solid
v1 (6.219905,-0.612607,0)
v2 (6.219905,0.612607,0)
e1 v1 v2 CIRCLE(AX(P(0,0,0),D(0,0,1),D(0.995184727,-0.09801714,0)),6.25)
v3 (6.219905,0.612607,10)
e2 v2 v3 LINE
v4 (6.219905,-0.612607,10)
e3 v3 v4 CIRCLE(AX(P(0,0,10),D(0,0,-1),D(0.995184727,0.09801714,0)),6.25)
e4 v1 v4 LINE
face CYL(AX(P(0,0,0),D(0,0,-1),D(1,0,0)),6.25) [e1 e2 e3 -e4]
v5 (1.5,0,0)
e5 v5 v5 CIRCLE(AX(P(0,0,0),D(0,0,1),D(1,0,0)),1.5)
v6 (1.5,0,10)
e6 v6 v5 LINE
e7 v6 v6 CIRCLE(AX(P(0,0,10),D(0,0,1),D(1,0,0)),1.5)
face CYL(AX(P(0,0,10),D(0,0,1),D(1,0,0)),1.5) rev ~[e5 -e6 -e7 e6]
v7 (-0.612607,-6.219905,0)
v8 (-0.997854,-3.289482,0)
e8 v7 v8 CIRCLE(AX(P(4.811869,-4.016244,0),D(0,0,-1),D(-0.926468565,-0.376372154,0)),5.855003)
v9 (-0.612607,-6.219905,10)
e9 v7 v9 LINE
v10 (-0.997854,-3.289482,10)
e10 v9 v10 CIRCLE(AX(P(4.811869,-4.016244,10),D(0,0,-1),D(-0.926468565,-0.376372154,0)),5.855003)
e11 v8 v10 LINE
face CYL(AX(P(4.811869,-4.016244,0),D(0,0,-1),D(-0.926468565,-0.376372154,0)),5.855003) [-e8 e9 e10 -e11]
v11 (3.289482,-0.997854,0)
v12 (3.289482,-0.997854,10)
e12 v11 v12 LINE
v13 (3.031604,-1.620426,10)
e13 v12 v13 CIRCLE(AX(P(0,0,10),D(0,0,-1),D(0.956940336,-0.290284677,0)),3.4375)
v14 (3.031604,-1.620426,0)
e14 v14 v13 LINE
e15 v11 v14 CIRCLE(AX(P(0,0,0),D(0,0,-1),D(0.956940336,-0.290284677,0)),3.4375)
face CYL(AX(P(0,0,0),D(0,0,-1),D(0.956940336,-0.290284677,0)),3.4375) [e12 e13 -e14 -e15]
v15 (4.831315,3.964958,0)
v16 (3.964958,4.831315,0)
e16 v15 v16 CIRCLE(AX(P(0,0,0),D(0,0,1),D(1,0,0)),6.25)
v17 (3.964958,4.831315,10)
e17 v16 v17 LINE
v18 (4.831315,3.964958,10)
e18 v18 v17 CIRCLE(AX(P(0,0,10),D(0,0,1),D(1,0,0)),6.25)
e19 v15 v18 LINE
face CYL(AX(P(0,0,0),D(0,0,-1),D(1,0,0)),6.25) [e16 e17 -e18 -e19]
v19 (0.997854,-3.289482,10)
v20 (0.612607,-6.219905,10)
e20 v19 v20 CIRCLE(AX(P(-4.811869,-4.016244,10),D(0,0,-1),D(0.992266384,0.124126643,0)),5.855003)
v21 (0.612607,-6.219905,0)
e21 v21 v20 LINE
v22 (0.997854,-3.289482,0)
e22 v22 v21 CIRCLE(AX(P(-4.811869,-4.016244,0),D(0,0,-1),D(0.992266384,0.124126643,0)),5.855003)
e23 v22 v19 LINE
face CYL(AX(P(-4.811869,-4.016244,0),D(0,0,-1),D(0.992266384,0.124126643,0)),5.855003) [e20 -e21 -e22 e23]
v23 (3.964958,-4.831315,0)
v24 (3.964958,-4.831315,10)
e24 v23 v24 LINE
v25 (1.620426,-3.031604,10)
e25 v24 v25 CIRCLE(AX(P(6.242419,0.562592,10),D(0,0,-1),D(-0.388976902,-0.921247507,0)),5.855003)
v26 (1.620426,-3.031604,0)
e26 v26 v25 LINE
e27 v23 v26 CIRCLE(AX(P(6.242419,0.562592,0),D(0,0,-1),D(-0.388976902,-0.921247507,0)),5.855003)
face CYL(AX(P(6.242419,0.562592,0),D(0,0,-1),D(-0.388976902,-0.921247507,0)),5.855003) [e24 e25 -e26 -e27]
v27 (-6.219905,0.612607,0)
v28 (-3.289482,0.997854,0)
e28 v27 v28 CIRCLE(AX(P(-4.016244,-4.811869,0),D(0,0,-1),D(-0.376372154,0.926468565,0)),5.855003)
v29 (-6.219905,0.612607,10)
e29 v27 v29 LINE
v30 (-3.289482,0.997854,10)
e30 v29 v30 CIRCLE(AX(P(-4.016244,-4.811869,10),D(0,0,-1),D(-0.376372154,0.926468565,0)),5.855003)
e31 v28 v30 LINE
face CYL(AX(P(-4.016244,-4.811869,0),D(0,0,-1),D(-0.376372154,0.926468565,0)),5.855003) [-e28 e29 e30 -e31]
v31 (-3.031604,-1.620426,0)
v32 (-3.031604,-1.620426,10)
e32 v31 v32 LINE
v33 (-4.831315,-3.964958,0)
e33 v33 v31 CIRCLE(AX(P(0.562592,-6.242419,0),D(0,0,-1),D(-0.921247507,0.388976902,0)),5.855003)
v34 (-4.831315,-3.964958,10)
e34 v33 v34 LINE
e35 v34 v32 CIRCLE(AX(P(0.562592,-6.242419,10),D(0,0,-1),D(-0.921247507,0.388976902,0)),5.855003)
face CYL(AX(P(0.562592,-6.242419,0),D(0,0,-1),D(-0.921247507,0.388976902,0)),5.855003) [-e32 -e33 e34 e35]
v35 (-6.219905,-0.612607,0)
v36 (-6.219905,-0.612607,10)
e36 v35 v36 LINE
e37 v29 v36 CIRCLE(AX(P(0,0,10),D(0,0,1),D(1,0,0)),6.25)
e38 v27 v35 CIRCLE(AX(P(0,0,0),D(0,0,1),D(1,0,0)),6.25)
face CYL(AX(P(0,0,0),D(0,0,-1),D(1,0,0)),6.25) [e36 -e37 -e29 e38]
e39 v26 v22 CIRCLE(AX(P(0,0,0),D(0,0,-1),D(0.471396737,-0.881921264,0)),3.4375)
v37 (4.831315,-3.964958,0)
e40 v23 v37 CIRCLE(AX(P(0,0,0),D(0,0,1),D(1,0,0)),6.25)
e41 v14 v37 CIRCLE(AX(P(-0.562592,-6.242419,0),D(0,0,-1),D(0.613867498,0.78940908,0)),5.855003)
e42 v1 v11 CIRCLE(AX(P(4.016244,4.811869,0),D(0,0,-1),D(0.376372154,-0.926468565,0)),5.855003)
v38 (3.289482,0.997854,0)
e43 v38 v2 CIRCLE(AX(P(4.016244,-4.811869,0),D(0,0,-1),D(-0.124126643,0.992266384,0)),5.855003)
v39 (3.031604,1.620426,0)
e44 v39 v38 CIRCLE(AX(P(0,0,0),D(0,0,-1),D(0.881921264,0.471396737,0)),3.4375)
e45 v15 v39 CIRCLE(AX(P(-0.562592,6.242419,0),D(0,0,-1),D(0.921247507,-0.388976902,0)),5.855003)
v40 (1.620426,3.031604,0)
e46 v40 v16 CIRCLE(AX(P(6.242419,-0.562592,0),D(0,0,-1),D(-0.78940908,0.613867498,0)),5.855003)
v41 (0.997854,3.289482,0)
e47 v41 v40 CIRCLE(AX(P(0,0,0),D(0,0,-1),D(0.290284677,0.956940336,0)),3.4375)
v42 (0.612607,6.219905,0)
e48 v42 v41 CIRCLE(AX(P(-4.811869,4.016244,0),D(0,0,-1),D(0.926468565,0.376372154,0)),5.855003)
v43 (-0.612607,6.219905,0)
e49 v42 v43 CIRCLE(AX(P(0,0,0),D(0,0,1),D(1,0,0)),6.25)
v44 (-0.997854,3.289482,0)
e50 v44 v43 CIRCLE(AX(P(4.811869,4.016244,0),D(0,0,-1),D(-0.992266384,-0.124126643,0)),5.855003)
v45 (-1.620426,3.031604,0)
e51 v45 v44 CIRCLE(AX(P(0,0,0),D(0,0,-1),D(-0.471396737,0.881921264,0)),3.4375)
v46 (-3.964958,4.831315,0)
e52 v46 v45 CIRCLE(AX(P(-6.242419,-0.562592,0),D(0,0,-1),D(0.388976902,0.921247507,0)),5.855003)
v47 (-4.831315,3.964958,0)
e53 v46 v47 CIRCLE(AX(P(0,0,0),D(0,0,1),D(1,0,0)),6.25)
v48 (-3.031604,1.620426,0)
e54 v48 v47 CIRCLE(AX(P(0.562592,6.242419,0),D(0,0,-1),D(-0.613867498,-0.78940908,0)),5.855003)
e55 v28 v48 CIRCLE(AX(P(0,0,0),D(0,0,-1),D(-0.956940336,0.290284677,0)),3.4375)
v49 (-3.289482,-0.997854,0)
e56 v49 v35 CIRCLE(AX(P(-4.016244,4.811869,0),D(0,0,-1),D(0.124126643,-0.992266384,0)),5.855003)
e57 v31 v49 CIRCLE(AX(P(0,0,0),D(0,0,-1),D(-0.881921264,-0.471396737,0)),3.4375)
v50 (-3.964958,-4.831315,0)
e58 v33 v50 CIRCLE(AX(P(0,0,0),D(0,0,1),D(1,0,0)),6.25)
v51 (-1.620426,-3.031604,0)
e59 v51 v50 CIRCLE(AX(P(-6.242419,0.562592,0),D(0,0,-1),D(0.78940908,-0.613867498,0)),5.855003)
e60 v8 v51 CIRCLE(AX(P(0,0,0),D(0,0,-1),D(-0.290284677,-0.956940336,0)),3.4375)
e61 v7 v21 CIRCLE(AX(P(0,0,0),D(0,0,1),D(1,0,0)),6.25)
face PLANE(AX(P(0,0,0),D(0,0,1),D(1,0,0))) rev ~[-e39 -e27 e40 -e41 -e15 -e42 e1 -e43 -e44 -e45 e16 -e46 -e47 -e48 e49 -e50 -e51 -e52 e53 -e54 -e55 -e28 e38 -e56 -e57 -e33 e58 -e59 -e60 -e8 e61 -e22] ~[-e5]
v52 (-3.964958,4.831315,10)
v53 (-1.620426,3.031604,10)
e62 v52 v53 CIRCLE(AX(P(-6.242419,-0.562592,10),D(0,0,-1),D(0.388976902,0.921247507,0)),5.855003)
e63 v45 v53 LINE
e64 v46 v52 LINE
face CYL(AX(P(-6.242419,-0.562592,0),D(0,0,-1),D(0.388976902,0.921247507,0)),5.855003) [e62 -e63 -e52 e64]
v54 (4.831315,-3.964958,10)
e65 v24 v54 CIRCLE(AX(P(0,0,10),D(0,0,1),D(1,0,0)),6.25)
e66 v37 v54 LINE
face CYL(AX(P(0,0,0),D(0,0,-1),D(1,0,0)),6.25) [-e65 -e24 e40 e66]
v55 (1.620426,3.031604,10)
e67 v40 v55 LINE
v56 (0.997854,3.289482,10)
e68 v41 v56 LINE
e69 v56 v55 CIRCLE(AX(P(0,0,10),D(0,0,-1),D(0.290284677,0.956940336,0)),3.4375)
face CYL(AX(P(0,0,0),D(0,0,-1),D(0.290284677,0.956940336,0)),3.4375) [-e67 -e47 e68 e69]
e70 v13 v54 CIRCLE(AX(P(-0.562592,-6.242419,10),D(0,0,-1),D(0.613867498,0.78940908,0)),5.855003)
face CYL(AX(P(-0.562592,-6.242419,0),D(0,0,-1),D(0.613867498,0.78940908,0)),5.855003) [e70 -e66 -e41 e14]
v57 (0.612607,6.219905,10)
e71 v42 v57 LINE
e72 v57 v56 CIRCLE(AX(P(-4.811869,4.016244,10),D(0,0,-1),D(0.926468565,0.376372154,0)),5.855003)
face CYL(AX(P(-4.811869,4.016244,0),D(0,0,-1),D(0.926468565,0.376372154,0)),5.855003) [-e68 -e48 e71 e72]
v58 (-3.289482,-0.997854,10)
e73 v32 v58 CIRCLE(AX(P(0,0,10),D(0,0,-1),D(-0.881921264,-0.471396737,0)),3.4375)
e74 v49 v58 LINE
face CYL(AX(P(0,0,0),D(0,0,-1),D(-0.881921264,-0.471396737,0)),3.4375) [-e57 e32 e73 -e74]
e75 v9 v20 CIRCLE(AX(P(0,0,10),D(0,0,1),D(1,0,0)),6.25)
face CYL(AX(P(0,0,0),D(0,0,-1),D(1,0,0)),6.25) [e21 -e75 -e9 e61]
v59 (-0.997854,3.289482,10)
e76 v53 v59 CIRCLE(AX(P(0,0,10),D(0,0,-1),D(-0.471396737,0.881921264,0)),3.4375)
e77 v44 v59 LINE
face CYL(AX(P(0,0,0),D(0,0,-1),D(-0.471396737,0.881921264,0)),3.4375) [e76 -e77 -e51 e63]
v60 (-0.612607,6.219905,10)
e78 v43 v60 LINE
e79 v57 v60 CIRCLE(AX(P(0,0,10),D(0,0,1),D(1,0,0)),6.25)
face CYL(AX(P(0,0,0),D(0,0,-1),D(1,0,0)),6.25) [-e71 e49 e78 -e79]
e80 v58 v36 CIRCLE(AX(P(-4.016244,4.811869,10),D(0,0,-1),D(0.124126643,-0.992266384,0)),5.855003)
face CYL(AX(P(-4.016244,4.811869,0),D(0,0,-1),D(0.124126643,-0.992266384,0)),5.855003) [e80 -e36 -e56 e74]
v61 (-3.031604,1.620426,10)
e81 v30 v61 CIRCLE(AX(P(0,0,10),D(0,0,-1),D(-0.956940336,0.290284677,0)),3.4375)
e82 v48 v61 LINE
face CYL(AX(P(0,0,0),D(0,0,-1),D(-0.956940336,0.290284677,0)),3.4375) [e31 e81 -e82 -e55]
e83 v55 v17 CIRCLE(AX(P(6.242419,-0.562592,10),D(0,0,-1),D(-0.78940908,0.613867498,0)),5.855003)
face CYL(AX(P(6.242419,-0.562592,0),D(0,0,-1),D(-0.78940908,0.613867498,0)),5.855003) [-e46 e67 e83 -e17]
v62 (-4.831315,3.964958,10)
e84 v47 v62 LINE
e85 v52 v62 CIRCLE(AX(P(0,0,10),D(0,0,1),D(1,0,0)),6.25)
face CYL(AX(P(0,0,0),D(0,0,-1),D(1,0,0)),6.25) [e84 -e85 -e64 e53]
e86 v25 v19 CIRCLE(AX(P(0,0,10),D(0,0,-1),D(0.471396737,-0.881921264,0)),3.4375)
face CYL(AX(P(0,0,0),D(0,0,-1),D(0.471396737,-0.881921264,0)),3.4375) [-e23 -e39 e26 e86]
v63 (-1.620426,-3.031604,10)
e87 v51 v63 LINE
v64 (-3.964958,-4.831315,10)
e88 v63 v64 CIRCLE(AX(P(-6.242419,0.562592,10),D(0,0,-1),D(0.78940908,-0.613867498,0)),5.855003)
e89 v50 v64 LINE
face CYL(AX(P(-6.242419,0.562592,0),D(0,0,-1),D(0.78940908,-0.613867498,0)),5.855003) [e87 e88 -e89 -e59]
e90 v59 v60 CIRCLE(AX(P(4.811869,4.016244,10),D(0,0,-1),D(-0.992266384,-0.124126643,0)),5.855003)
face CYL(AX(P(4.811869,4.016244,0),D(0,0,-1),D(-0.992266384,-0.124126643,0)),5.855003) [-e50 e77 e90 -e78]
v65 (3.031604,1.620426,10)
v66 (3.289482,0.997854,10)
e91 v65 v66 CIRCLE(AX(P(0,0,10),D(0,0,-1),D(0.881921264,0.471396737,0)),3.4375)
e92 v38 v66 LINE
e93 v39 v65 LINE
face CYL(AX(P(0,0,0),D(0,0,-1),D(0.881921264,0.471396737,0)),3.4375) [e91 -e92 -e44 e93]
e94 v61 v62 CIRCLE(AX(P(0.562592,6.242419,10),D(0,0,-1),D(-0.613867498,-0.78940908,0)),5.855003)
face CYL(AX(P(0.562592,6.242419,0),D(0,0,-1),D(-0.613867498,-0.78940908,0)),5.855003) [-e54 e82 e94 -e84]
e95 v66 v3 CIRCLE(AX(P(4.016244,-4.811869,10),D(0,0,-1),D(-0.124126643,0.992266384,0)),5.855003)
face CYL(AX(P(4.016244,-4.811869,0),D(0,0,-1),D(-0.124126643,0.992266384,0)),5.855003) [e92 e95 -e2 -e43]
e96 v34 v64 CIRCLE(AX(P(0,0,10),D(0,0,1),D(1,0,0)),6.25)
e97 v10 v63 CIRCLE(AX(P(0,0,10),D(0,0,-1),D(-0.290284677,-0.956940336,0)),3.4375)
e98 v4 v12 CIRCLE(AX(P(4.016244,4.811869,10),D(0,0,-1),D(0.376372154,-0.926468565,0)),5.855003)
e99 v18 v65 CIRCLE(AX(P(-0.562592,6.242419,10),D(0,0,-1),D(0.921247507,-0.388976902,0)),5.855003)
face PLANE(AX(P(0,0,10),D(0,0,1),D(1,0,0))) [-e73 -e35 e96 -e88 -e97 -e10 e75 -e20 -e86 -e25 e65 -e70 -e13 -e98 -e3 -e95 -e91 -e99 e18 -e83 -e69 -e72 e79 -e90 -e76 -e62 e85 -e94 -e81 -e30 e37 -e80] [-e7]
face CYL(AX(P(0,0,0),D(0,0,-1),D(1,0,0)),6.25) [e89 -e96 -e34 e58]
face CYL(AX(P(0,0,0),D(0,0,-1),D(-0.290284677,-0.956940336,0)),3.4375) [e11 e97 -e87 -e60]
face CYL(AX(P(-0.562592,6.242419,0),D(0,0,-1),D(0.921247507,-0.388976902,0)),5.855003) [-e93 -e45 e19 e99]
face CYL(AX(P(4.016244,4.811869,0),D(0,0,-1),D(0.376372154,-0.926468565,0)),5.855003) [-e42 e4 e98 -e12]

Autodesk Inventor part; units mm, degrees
sketch "Sketch1" plane through (0, 0, 0) normal (0, 0, 1) x (1, 0, 0)
  circle A0 centre (0, 0) radius 6.25
  dimension "d0" = 12.5
extrude "Extrusion1" add sketch "Sketch1" along normal blind 10
ref_plane "Work Plane2" through (0, 0, 5) normal (0, 0, 1) x (1, 0, 0)
sketch "Sketch2" plane through (0, 0, 0) normal (0, 0, -1) x (-1, 0, 0)
  circle A0 centre (0, 0) radius 6.25 projected
  circle A1 centre (0, 0) radius 5
  dimension "d3" = 10
surface extrude "Pitch Diameter" sketch "Sketch2" against normal through all shown no curves A1
ref_plane "Work Plane8" through (0, 0, 0) normal (0.9238795, 0.3826834, 0) x (0, 0, 1)
ref_plane "Work Plane9" through (0, 0, 0) normal (1, 0, 0) x (0, 1, 0)
spur gear teeth "Spur Gear" teeth 8 pitch diameter 10 tip diameter 12.5 root diameter 6.875 face width 10 start plane through (0, 0, 0) normal (0, 0, -1) x (-1, 0, 0)
sketch "Sketch3" plane through (0, 0, 10) normal (0, 0, 1) x (1, 0, 0)
  arc A0 (-3.965, 4.8313) -> (-4.8313, 3.965) centre (0, 0) ccw projected
  circle A1 centre (0, 0) radius 1.5
  dimension "d49" = 3
extrude "Extrusion2" cut sketch "Sketch3" against normal blind 30
equation "\"d0\" = da_da"
equation "\"d1\" = da_b"
equation "\"d3\" = da_dw"
equation "\"d16\" = da_aw"
equation "\"d43\" = da_aw"
equation "\"d46\" = da_aw"
equation "\"da_da\" = 12.5"
equation "\"da_b\" = 10"
equation "\"da_dw\" = 10"
equation "\"da_aw\" = 42.5"
properties part number "Spur Gear1" material "Steel"
